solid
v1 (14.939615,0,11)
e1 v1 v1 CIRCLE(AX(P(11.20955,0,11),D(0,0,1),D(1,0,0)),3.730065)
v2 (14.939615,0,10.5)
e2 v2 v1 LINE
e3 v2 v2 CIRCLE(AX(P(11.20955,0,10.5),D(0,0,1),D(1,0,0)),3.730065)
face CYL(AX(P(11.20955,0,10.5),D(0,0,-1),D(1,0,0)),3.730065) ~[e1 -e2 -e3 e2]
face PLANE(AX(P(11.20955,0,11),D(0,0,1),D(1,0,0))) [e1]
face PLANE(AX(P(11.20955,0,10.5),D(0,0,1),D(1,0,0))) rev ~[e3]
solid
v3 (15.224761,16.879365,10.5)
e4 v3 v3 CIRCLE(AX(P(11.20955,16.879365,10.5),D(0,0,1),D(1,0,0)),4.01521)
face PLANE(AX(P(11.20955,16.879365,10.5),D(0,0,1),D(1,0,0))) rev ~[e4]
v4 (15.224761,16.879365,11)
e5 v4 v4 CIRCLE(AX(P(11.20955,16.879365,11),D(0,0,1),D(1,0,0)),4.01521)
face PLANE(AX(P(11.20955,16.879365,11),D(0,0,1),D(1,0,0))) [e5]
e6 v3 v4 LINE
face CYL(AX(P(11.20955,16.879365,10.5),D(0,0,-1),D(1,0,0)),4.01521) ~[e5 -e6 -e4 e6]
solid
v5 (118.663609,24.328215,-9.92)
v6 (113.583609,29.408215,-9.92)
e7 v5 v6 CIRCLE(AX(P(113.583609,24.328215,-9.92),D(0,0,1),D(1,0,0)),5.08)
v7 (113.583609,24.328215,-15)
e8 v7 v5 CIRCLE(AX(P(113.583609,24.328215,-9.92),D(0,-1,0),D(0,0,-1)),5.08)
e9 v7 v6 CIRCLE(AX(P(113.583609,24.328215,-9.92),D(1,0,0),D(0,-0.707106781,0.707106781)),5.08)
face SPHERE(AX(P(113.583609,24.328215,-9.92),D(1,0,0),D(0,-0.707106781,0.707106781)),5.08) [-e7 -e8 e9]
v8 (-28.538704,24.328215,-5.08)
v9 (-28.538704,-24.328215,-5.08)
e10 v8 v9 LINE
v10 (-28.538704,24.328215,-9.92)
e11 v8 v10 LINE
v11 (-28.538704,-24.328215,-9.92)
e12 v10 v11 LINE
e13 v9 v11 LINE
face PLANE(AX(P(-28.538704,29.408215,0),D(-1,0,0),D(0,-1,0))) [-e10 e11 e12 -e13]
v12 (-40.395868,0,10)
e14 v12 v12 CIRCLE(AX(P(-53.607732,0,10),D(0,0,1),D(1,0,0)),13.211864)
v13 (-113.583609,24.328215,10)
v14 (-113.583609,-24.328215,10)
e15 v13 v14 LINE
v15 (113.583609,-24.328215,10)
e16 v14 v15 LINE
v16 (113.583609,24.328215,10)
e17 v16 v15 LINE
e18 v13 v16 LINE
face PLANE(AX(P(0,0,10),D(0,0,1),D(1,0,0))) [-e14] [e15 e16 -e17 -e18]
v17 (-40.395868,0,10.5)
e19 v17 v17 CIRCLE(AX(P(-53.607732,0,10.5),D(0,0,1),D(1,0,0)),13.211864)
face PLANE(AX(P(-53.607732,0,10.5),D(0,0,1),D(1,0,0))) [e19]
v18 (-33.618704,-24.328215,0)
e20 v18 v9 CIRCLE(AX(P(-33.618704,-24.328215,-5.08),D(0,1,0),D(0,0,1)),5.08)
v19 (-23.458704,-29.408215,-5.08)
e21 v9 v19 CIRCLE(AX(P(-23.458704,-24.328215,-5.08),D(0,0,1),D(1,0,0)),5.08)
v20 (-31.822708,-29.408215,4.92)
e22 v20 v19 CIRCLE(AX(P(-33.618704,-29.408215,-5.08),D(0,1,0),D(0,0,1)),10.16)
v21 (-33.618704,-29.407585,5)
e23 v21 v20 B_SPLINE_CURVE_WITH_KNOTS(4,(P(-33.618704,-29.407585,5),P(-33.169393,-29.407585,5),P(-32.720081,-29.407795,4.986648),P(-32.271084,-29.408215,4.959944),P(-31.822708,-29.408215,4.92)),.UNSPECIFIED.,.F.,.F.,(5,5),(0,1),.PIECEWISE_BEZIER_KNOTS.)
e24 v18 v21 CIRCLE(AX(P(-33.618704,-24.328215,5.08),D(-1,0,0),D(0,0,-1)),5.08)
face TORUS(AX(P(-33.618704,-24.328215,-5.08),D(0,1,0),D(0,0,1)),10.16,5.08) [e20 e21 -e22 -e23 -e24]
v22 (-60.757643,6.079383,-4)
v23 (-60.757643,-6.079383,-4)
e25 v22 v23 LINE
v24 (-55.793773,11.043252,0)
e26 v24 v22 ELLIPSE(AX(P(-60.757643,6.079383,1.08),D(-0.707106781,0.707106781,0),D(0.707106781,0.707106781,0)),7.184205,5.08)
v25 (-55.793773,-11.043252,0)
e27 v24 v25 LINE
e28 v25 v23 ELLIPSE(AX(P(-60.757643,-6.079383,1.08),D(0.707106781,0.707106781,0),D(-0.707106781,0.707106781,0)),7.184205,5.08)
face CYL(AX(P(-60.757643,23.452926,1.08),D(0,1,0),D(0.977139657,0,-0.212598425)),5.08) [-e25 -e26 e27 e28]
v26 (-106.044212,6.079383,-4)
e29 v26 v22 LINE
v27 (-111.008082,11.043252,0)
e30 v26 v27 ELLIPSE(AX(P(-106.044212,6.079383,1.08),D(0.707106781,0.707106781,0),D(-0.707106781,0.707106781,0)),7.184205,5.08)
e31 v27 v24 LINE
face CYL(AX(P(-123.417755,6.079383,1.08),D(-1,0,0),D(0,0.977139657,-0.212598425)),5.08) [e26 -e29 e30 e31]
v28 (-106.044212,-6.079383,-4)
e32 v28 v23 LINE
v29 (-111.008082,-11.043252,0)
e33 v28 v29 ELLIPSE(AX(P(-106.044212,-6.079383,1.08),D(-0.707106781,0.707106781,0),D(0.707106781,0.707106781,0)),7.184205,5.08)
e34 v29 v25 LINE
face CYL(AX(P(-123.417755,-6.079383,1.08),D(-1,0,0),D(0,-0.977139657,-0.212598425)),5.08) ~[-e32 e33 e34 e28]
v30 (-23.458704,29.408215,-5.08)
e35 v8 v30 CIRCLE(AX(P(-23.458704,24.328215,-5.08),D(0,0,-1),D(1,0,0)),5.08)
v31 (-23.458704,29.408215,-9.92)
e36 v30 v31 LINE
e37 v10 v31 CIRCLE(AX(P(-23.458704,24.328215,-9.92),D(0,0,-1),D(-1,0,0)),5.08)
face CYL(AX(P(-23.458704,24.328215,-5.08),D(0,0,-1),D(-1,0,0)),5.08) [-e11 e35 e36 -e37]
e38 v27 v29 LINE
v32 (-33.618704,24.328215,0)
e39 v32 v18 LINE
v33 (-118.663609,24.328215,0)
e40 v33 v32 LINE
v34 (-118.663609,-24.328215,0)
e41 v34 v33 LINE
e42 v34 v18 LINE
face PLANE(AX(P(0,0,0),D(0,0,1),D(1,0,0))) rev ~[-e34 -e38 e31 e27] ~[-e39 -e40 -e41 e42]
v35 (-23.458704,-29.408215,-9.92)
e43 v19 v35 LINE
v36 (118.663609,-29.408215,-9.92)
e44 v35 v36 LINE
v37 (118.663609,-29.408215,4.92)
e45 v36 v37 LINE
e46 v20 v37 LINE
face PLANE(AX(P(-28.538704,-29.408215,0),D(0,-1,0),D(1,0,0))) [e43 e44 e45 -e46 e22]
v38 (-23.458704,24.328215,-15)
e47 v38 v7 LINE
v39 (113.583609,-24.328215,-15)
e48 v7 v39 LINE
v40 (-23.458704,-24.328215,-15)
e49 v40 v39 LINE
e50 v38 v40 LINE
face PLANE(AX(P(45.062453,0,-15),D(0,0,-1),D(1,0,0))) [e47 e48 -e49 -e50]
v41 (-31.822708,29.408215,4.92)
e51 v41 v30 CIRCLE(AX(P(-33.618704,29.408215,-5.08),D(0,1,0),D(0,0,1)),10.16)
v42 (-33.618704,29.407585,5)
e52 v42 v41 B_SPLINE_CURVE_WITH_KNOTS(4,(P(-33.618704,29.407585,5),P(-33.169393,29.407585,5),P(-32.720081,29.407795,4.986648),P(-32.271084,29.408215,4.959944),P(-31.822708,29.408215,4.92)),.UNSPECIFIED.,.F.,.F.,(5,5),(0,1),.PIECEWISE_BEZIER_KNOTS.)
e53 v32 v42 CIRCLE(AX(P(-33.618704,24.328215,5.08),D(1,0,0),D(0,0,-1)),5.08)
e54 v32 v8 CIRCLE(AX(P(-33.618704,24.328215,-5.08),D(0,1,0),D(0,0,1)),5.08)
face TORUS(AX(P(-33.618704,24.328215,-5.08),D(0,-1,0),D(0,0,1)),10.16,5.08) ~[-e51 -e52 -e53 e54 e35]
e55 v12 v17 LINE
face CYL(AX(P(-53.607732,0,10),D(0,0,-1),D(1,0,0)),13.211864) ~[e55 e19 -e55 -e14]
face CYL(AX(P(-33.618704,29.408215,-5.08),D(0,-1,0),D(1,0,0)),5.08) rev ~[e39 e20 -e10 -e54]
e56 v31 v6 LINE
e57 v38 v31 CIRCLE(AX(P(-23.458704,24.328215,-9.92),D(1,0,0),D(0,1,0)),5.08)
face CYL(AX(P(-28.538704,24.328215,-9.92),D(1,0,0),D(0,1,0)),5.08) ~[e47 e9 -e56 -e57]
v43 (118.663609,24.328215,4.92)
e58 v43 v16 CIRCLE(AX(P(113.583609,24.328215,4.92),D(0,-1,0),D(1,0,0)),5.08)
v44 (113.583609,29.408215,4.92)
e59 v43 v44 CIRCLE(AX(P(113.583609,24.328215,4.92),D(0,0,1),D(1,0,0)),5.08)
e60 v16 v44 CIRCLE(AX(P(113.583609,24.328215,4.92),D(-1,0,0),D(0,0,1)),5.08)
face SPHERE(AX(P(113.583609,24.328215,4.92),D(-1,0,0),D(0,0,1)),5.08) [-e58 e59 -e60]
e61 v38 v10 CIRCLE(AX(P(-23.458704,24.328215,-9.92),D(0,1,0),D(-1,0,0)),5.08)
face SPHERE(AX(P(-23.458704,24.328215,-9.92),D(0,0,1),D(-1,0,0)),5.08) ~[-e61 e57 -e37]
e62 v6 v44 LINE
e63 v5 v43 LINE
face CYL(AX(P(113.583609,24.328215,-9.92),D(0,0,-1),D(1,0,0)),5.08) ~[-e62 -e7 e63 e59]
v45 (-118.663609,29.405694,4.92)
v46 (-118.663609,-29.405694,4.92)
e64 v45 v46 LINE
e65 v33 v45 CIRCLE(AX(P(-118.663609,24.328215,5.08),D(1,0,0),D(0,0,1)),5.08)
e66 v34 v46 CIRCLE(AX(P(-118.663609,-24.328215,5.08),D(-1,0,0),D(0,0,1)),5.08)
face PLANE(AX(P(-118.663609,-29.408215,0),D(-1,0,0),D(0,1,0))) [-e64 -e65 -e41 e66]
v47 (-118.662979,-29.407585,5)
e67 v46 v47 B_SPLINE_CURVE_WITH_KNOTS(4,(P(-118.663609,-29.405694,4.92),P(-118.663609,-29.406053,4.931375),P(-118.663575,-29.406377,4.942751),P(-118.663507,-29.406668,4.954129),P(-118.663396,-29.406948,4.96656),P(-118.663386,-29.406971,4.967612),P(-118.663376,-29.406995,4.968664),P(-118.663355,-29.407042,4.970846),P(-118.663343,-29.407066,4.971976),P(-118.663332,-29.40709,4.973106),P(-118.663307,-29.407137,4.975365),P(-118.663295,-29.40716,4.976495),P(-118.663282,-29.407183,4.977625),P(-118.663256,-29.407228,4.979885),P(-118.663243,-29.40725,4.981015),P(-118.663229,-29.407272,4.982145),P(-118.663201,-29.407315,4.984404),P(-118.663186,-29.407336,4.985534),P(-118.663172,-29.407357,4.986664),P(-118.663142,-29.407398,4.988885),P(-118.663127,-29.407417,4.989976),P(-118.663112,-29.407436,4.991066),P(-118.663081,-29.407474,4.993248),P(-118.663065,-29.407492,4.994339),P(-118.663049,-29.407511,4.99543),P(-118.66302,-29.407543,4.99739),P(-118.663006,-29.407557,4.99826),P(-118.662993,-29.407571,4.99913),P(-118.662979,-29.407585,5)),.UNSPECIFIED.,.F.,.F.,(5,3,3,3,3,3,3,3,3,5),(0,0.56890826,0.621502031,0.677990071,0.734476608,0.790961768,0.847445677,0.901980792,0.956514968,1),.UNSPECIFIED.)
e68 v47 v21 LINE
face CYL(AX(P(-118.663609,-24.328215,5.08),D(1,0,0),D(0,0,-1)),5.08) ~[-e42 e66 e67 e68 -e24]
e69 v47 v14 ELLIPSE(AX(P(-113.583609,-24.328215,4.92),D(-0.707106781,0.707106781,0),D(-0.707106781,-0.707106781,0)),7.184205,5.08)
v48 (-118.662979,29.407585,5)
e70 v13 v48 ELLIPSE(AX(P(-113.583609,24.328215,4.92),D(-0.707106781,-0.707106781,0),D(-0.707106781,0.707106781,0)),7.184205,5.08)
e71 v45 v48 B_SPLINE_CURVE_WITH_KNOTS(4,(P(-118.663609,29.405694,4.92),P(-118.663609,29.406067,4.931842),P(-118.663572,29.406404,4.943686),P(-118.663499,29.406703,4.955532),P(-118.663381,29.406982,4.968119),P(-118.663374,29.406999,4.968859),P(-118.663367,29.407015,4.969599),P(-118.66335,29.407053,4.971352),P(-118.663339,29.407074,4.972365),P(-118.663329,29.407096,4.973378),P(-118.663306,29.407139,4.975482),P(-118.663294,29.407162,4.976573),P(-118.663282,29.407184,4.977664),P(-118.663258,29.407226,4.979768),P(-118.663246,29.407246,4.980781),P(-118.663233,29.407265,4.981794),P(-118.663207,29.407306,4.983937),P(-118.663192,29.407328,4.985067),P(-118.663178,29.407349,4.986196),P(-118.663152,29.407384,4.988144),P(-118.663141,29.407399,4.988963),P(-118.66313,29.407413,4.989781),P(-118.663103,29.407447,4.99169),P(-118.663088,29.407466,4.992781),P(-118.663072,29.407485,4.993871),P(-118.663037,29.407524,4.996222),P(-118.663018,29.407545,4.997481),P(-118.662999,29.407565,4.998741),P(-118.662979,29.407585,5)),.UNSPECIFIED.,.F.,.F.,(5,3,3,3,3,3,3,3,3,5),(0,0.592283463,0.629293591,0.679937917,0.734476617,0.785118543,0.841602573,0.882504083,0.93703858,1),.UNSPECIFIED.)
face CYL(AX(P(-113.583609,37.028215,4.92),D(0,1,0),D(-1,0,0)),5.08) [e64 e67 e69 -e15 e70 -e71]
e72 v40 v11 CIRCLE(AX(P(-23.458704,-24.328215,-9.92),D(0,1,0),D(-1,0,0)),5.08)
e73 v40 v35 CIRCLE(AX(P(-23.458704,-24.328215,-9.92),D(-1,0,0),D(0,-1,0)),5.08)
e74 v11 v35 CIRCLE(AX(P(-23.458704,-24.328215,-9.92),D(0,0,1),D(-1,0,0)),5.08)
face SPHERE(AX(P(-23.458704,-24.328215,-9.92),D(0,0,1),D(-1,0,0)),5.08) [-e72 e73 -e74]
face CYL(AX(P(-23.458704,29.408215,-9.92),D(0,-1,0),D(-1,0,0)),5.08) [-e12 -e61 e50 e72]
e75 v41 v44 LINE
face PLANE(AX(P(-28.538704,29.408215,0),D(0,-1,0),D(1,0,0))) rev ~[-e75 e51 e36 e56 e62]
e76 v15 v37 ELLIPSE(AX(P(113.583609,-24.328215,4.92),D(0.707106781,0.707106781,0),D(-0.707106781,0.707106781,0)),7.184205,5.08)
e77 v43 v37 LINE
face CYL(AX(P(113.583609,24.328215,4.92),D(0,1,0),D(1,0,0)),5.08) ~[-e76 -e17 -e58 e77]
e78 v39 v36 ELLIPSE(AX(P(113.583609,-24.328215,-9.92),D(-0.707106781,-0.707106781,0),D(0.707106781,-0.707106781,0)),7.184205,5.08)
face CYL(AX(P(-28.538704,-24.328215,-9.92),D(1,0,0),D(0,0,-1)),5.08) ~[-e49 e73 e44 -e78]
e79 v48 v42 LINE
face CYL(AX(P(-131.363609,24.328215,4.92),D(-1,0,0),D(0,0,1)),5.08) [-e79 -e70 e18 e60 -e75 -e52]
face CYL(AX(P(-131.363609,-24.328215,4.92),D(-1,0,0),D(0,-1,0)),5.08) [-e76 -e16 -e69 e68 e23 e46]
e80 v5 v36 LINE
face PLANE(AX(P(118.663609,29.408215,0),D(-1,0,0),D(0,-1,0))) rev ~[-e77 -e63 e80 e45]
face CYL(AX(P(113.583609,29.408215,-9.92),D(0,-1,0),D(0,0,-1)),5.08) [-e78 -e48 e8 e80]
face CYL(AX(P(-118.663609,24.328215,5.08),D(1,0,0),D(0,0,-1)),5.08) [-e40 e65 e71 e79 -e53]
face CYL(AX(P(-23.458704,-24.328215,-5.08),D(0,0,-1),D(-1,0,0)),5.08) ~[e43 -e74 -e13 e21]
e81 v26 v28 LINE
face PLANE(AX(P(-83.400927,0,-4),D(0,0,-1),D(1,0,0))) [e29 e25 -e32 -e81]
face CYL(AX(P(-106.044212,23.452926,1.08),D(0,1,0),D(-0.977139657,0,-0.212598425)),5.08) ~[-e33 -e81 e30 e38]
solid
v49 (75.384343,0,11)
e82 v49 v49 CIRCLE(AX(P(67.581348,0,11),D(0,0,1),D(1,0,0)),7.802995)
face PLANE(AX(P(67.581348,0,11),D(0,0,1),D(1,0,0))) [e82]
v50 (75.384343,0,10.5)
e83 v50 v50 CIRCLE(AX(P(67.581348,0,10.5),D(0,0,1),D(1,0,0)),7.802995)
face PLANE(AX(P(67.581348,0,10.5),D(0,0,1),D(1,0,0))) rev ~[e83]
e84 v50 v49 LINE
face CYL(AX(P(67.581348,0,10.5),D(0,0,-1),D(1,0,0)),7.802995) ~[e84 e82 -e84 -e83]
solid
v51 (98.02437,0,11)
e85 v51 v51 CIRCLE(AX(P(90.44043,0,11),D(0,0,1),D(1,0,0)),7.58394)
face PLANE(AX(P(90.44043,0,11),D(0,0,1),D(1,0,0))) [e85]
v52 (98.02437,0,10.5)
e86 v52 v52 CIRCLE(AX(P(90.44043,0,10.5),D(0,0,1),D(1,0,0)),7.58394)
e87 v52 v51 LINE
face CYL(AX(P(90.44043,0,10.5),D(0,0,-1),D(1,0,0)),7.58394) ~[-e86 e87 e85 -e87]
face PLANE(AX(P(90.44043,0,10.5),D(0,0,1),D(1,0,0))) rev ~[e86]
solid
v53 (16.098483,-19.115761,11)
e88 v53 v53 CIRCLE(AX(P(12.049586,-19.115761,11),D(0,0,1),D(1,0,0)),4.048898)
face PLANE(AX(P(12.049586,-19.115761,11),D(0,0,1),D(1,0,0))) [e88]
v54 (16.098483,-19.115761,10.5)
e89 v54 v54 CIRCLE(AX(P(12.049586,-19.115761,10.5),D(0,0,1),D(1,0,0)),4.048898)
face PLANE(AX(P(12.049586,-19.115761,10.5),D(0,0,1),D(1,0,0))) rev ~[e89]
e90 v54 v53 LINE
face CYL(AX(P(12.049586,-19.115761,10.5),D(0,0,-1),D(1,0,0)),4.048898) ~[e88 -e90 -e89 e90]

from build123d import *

# Parameters (mm, degrees)
F0_W          = 237.3272180557
F0_H          = 58.8164292276
F1_DEPTH      = 10
F2_W          = 147.2023129463
F2_H          = 58.8164292276
F3_DEPTH      = 15
F4_F1_R       = 5.08
F4_F2_R       = 5.08
F5_W          = 55.2143082023
F5_H          = 22.0865048468
F6_DEPTH      = 4
F7_T1_DEPTH   = 46.9058521388
F7_T3_DEPTH   = 80.0336554942
F9_R          = 13.2118644906
F10_DEPTH     = 0.5
F12_R         = 4.0488978151
F13_DEPTH     = 0.5
F12_R_2       = 3.7300649458
F12_R_3       = 4.0152102199
F12_R_4       = 7.8029945449
F12_R_5       = 7.5839402098
F14_T1_DEPTH  = 262.7272180557
F15_T1_DEPTH  = 66.4364292276
F15_T3_DEPTH  = 262.7272180557
F15_T5_DEPTH  = 14.84
F15_S9_W      = 5.08
F15_S9_H      = 5.08
F15_T10_DEPTH = 5.08
F15_T14_ANGLE = 89.9999999979
F16_T1_DEPTH  = 74.0564292276


# Not quite as in the source:
# - a fillet or chamfer that OpenCascade refuses, or shapes differently, is made with other operations: its cross-section is extruded or revolved along the edge and cut away or added


with BuildPart() as f1:
    # F0 (on Top) → F1 (new body)
    with BuildSketch(Plane.XY):
        Rectangle(F0_W, F0_H)
    extrude(amount=F1_DEPTH)

    # F2 (on face) → F3 (join)
    with BuildSketch(Plane(origin=(0, 0, 0), x_dir=(1, 0, 0), z_dir=(0, 0, -1))):
        with Locations((45.0624525547, 0)):
            Rectangle(F2_W, F2_H)
    extrude(amount=F3_DEPTH)

    # F4: fillet of radius 5.08 on 7 edges, made by hand

    # F4_f1
    f4_f1_edges = [f1.edges().sort_by_distance(p)[0] for p in [
        (-28.5387039185, 0, 0),
    ]]
    fillet(f4_f1_edges, radius=F4_F1_R)

    # F4_f2
    f4_f2_edges = [f1.edges().sort_by_distance(p)[0] for p in [
        (-28.5387039185, -29.4082146138, -10.04),
        (-28.5387039185, 29.4082146138, -10.04),
        (-28.5387039185, 0, -15),
        (45.0624525547, 29.4082146138, -15),
        (118.6636090279, 0, -15),
        (45.0624525547, -29.4082146138, -15),
        (-30.02660147, 29.4082146138, -1.4878975516),
        (-30.02660147, -29.4082146138, -1.4878975516),
    ]]
    fillet(f4_f2_edges, radius=F4_F2_R)

    # F5 (on face) → F6 (join)
    with BuildSketch(Plane(origin=(0, 0, 0), x_dir=(1, 0, 0), z_dir=(0, 0, -1))):
        with Locations((-83.400927484, 0)):
            Rectangle(F5_W, F5_H)
    extrude(amount=F6_DEPTH)

    # F7: fillet of radius 5.08 on 4 edges, made by hand

    # F7_s2 → F7_t1 (cut)
    with BuildSketch(Plane.XZ.offset(-23.4529260694)):
        with BuildLine():
            ThreePointArc((-55.7937733829, 0), (-57.5701673512, -2.8755530587), (-60.7576428413, -4))
            Line((-60.7576428413, -4), (-55.7937733829, -4))
            Line((-55.7937733829, -4), (-55.7937733829, 0))
        make_face()
        with BuildLine():
            ThreePointArc((-111.0080815852, 0), (-109.2316876169, -2.8755530587), (-106.0442121268, -4))
            Line((-106.0442121268, -4), (-111.0080815852, -4))
            Line((-111.0080815852, -4), (-111.0080815852, 0))
        make_face()
    extrude(amount=F7_T1_DEPTH, mode=Mode.SUBTRACT)

    # F7_s4 → F7_t3 (cut)
    with BuildSketch(Plane.YZ.offset(-123.4177552312)):
        with BuildLine():
            ThreePointArc((-11.0432524234, 0), (-9.2668584551, -2.8755530587), (-6.079382965, -4))
            Line((-6.079382965, -4), (-11.0432524234, -4))
            Line((-11.0432524234, -4), (-11.0432524234, 0))
        make_face()
        with BuildLine():
            ThreePointArc((11.0432524234, 0), (9.2668584551, -2.8755530587), (6.079382965, -4))
            Line((6.079382965, -4), (11.0432524234, -4))
            Line((11.0432524234, -4), (11.0432524234, 0))
        make_face()
    extrude(amount=F7_T3_DEPTH, mode=Mode.SUBTRACT)

    # F9 (on face) → F10 (join)
    with BuildSketch(Plane.XY.offset(10)):
        with Locations((-53.6077320576, 0)):
            Circle(F9_R)
    extrude(amount=F10_DEPTH)

    # F14: fillet of radius 5.08 on 1 edges, made by hand

    # F14_s2 → F14_t1 (cut)
    with BuildSketch(Plane.YZ.offset(-131.3636090279)):
        with BuildLine():
            ThreePointArc((24.3282146138, 10), (27.9203170622, 8.5121024484), (29.4082146138, 4.92))
            Line((29.4082146138, 4.92), (29.4082146138, 10))
            Line((29.4082146138, 10), (24.3282146138, 10))
        make_face()
    extrude(amount=F14_T1_DEPTH, mode=Mode.SUBTRACT)

    # F15: fillet of radius 5.08 on 2 edges, made by hand

    # F15_s2 → F15_t1 (cut)
    with BuildSketch(Plane.XZ.offset(-24.3282146138)):
        with BuildLine():
            ThreePointArc((118.6636090279, 4.92), (117.1757114763, 8.5121024484), (113.5836090279, 10))
            Line((113.5836090279, 10), (118.6636090279, 10))
            Line((118.6636090279, 10), (118.6636090279, 4.92))
        make_face()
    extrude(amount=F15_T1_DEPTH, mode=Mode.SUBTRACT)

    # F15_s4 → F15_t3 (cut)
    with BuildSketch(Plane.YZ.offset(-131.3636090279)):
        with BuildLine():
            ThreePointArc((-29.4082146138, 4.92), (-27.9203170622, 8.5121024484), (-24.3282146138, 10))
            Line((-24.3282146138, 10), (-29.4082146138, 10))
            Line((-29.4082146138, 10), (-29.4082146138, 4.92))
        make_face()
    extrude(amount=F15_T3_DEPTH, mode=Mode.SUBTRACT)

    # F15_s6 → F15_t5 (cut)
    with BuildSketch(Plane.XY.offset(-9.92)):
        with BuildLine():
            ThreePointArc((118.6636090279, 24.3282146138), (117.1757114763, 27.9203170622), (113.5836090279, 29.4082146138))
            Line((113.5836090279, 29.4082146138), (118.6636090279, 29.4082146138))
            Line((118.6636090279, 29.4082146138), (118.6636090279, 24.3282146138))
        make_face()
    extrude(amount=F15_T5_DEPTH, mode=Mode.SUBTRACT)


with BuildPart() as f13:
    # F12 (on face) → F13 (new body)
    with BuildSketch(Plane.XY.offset(10.5)):
        with Locations((12.0495855808, -19.1157609224)):
            Circle(F12_R)
    extrude(amount=F13_DEPTH)


with BuildPart() as f13b:
    # F12 (on face) → F13, piece 2 (new body)
    with BuildSketch(Plane.XY.offset(10.5)):
        with Locations((11.2095503137, 0)):
            Circle(F12_R_2)
    extrude(amount=F13_DEPTH)


with BuildPart() as f13c:
    # F12 (on face) → F13, piece 3 (new body)
    with BuildSketch(Plane.XY.offset(10.5)):
        with Locations((11.2095503137, 16.8793648481)):
            Circle(F12_R_3)
    extrude(amount=F13_DEPTH)


with BuildPart() as f13d:
    # F12 (on face) → F13, piece 4 (new body)
    with BuildSketch(Plane.XY.offset(10.5)):
        with Locations((67.5813481212, 0)):
            Circle(F12_R_4)
    extrude(amount=F13_DEPTH)


with BuildPart() as f13e:
    # F12 (on face) → F13, piece 5 (new body)
    with BuildSketch(Plane.XY.offset(10.5)):
        with Locations((90.4404297471, 0)):
            Circle(F12_R_5)
    extrude(amount=F13_DEPTH)


with BuildPart() as f15_tool8:
    # F15_s9 → F15_t10 (new body)
    with BuildSketch(Plane.YZ.offset(113.5836090279)):
        with Locations((26.8682146138, -12.46)):
            Rectangle(F15_S9_W, F15_S9_H)
    extrude(amount=F15_T10_DEPTH)

    # F15_s11 → F15_t12 (revolve, cut)
    with BuildSketch(Plane(origin=(113.5836090279, 24.3282146138, -9.92), x_dir=(0, -0.7071067812, 0.7071067812), z_dir=(0, 0.7071067812, 0.7071067812))):
        with BuildLine():
            ThreePointArc((0, -5.08), (5.08, 0), (0, 5.08))
            Line((0, 5.08), (0, -5.08))
        make_face()
    revolve(axis=Axis((113.5836090279, 24.3282146138, -9.92), (1, 0, 0)), mode=Mode.SUBTRACT)


with BuildPart() as f1_1:
    add(f1.part)

    # F15_t7: cut F15_tool8
    add(f15_tool8.part, mode=Mode.SUBTRACT)

    # F15_s13 → F15_t14 (revolve, cut)
    with BuildSketch(Plane.XZ.offset(-24.3282146137)):
        with BuildLine():
            ThreePointArc((118.6636090279, 4.92), (117.1757114763, 8.5121024484), (113.5836090279, 10))
            Line((113.5836090279, 10), (118.6636090279, 10))
            Line((118.6636090279, 10), (118.6636090279, 4.92))
        make_face()
    revolve(axis=Axis((118.6636090279, 24.3282146137, 4.9199999999), (-1, 0, 0)), revolution_arc=F15_T14_ANGLE, mode=Mode.SUBTRACT)

    # F16: fillet of radius 5.08 on 1 edges, made by hand

    # F16_s2 → F16_t1 (cut)
    with BuildSketch(Plane.XZ.offset(-37.0282146138)):
        with BuildLine():
            ThreePointArc((-118.6636090279, 4.92), (-117.1757114763, 8.5121024484), (-113.5836090279, 10))
            Line((-113.5836090279, 10), (-118.6636090279, 10))
            Line((-118.6636090279, 10), (-118.6636090279, 4.92))
        make_face()
    extrude(amount=F16_T1_DEPTH, mode=Mode.SUBTRACT)


solid = Compound([f13.part, f13b.part, f13c.part, f13d.part, f13e.part, f1_1.part])
